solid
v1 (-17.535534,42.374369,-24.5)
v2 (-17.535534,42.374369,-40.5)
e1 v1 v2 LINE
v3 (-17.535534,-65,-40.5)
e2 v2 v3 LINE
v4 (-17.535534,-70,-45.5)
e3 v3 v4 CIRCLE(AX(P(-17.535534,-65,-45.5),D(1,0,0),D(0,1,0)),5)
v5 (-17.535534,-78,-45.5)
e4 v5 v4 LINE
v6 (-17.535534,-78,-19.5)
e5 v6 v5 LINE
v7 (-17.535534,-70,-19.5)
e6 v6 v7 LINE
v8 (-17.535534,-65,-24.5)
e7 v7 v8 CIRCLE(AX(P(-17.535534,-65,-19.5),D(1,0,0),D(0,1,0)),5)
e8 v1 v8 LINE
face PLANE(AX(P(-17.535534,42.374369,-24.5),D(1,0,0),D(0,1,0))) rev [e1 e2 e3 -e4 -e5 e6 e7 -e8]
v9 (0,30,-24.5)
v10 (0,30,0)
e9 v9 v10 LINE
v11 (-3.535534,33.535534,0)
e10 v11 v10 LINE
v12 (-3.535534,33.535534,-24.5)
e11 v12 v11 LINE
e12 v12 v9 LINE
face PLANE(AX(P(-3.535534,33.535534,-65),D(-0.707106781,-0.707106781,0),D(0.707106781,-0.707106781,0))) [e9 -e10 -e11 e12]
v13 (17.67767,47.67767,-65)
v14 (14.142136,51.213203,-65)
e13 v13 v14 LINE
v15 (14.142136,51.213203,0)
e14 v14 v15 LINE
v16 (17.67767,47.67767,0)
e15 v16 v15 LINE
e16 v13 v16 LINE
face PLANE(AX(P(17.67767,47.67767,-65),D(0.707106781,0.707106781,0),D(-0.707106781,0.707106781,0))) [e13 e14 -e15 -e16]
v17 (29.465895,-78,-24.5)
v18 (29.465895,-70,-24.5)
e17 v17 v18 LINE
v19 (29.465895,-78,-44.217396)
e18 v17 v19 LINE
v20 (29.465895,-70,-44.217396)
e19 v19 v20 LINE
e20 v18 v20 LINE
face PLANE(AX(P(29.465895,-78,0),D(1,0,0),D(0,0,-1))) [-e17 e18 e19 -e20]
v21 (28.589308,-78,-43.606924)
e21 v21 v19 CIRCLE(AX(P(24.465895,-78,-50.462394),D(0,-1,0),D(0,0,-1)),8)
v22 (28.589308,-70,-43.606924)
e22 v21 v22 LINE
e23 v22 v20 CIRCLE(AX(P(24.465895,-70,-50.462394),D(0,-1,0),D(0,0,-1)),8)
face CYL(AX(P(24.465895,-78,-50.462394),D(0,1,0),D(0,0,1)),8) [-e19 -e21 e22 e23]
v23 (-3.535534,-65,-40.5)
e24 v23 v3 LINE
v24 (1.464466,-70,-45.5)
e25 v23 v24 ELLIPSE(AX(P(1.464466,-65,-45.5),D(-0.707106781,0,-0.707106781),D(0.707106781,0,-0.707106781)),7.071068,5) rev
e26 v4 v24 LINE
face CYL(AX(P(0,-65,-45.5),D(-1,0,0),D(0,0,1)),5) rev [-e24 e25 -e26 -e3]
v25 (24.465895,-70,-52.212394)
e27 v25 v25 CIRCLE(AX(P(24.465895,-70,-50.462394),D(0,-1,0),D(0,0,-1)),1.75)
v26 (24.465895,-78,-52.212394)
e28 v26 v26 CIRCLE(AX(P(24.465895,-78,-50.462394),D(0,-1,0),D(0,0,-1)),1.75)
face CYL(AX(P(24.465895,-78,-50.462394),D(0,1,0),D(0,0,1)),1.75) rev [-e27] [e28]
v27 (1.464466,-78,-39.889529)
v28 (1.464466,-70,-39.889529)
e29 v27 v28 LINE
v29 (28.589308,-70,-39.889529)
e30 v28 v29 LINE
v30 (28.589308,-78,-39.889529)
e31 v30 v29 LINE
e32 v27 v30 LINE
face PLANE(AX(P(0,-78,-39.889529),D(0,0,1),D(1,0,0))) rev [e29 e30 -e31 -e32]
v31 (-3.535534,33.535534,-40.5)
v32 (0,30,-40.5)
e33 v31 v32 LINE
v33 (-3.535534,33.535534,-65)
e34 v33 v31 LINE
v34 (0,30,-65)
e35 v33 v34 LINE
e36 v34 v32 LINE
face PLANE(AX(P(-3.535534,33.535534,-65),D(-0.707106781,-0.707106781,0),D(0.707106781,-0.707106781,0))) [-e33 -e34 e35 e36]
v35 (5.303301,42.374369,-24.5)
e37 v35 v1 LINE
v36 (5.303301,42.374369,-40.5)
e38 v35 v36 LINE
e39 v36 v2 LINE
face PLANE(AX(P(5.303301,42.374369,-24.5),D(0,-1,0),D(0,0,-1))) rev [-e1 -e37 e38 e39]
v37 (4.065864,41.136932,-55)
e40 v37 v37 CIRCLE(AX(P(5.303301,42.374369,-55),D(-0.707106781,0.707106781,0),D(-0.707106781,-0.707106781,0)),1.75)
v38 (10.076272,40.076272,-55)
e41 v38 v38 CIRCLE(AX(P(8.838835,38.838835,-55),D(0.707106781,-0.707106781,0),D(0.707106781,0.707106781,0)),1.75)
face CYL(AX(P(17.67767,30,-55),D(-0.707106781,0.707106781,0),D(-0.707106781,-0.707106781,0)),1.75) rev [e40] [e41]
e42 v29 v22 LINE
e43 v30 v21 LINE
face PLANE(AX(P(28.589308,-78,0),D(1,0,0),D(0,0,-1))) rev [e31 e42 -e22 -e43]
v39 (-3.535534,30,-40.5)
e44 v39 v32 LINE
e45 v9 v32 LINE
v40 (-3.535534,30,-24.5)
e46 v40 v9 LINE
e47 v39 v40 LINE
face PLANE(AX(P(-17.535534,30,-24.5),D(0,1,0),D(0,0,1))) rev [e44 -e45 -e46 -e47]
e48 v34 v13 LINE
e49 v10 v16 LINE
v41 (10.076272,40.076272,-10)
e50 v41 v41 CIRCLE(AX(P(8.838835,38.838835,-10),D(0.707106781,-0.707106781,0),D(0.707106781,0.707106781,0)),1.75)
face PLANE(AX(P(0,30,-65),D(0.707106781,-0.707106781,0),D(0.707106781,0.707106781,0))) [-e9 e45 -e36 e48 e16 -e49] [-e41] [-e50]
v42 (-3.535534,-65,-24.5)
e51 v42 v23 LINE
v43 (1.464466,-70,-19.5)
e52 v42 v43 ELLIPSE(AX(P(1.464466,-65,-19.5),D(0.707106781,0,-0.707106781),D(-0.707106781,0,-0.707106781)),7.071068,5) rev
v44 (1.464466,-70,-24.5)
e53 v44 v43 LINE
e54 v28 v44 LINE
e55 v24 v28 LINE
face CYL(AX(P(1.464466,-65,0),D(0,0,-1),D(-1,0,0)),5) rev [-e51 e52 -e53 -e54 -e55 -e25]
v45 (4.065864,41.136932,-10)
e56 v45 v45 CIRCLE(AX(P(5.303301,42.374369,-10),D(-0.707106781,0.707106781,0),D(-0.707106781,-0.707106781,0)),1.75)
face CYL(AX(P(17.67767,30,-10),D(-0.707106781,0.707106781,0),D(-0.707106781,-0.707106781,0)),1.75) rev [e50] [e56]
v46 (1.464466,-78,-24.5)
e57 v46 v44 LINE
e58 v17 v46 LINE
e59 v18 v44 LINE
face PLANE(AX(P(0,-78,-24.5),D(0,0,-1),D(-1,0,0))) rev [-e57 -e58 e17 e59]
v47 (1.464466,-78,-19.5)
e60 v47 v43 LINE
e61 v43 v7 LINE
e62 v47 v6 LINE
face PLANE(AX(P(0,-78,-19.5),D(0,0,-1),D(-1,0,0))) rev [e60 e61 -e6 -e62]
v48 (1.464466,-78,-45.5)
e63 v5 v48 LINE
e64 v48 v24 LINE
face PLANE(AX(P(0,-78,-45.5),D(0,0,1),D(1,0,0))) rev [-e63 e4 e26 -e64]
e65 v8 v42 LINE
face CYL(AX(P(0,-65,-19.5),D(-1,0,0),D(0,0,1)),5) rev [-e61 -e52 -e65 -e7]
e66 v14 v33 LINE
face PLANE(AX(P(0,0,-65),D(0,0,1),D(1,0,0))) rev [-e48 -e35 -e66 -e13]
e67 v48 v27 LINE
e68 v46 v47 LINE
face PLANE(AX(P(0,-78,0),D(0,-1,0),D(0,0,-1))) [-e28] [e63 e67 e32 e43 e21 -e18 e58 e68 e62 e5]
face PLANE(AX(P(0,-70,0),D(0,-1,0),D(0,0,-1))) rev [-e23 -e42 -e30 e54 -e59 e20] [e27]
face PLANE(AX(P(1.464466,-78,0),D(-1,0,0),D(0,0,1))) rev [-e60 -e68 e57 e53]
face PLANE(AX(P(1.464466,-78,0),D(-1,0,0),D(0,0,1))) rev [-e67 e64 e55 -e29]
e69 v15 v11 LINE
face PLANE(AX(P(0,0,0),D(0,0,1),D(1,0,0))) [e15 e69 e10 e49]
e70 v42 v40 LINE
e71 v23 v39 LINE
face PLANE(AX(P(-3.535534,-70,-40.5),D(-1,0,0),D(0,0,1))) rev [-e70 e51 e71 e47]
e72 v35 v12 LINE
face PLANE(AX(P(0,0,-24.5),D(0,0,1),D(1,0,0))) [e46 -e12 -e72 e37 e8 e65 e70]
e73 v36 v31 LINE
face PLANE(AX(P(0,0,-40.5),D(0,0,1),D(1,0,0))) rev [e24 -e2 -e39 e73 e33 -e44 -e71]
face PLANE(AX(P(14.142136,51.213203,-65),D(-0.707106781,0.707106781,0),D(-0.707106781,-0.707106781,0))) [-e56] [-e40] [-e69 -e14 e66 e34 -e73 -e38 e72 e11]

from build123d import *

# Parameters (mm, degrees)
BOSS_EXTRUDE2_DEPTH      = 65
CUT_EXTRUDE1_DEPTH       = 82.266390279
CUT_EXTRUDE1_DEPTH_BACK  = 82.266390279
SKETCH4_R                = 1.75
BOSS_EXTRUDE3_DEPTH      = 8
BOSS_EXTRUDE3_DEPTH_BACK = 8
BOSS_EXTRUDE3_START      = -32.5
SKETCH9_W                = 14
SKETCH9_H                = 16
BOSS_EXTRUDE4_DEPTH      = 100
SKETCH10_R               = 1.75
BOSS_EXTRUDE5_DEPTH      = 8
FILLET4_R                = 5


with BuildPart() as part:
    # Sketch3 → Boss-Extrude2 (new body)
    with BuildSketch(Plane.XY):
        Polygon((-3.535533906, 33.535533906), (0, 30), (17.67766953, 47.67766953), (14.142135624, 51.213203436), align=None)
    extrude(amount=-BOSS_EXTRUDE2_DEPTH)

    # Sketch4 → Cut-Extrude1 (cut, two sides: drawn at the far end of the back side and taken through both)
    with BuildSketch(Plane(origin=(-18.535533906, 18.535533906, 0), x_dir=(0, 0, 1), z_dir=(-0.7071067811865477, 0.7071067811865475, 0)).offset(-CUT_EXTRUDE1_DEPTH_BACK)):
        with Locations(Location((-10, 33.713203436, 0), (0, 0, 270))):
            Circle(SKETCH4_R)
        with Locations(Location((-55, 33.713203436, 0), (0, 0, 270))):
            Circle(SKETCH4_R)
    extrude(amount=CUT_EXTRUDE1_DEPTH + CUT_EXTRUDE1_DEPTH_BACK, mode=Mode.SUBTRACT)

    # Sketch8 → Boss-Extrude3 (add, two sides: drawn at the far end of the back side and taken through both)
    with BuildSketch(Plane(origin=(0, 0, -65), x_dir=(-1, 0, 0), z_dir=(0, 0, -1)).offset(BOSS_EXTRUDE3_START - BOSS_EXTRUDE3_DEPTH_BACK)):
        Polygon((-5.303300859, 42.374368671), (17.535533906, 42.374368671), (17.535533906, 30), (0, 30), (3.535533906, 33.535533906), align=None)
    extrude(amount=BOSS_EXTRUDE3_DEPTH + BOSS_EXTRUDE3_DEPTH_BACK)

    # Sketch9 → Boss-Extrude4 (add)
    with BuildSketch(Plane.XZ.offset(-30)):
        with Locations((-10.535533906, -32.5)):
            Rectangle(SKETCH9_W, SKETCH9_H)
    extrude(amount=BOSS_EXTRUDE4_DEPTH)

    # Sketch10 → Boss-Extrude5 (add)
    with BuildSketch(Plane.XZ.offset(70)):
        with BuildLine():
            Line((29.465894629, -44.217395538), (29.465894629, -24.5))
            Line((29.465894629, -24.5), (1.464466094, -24.5))
            Line((1.464466094, -24.5), (1.464466094, -19.5))
            Line((1.464466094, -19.5), (-17.535533906, -19.5))
            Line((-17.535533906, -19.5), (-17.535533906, -45.5))
            Line((-17.535533906, -45.5), (1.464466094, -45.5))
            Line((1.464466094, -45.5), (1.464466094, -39.889528684))
            Line((1.464466094, -39.889528684), (28.589308321, -39.889528684))
            Line((28.589308321, -39.889528684), (28.589308321, -43.606924222))
            ThreePointArc((28.589308321, -43.606924222), (19.893987133, -57.027274483), (29.465894629, -44.217395538))
        make_face()
        with Locations(Location((24.465894629, -50.462393537, 0), (0, 0, 270))):
            Circle(SKETCH10_R, mode=Mode.SUBTRACT)
    extrude(amount=BOSS_EXTRUDE5_DEPTH)

    # Fillet4
    fillet4_edges = [part.edges().sort_by_distance(p)[0] for p in [
        (-10.535533906, -70, -40.5),
        (-10.535533906, -70, -24.5),
        (-3.535533906, -70, -32.5),
    ]]
    fillet(fillet4_edges, radius=FILLET4_R - 0.0001)  # a hair under: the kernel refuses the full size


solid = part.part
